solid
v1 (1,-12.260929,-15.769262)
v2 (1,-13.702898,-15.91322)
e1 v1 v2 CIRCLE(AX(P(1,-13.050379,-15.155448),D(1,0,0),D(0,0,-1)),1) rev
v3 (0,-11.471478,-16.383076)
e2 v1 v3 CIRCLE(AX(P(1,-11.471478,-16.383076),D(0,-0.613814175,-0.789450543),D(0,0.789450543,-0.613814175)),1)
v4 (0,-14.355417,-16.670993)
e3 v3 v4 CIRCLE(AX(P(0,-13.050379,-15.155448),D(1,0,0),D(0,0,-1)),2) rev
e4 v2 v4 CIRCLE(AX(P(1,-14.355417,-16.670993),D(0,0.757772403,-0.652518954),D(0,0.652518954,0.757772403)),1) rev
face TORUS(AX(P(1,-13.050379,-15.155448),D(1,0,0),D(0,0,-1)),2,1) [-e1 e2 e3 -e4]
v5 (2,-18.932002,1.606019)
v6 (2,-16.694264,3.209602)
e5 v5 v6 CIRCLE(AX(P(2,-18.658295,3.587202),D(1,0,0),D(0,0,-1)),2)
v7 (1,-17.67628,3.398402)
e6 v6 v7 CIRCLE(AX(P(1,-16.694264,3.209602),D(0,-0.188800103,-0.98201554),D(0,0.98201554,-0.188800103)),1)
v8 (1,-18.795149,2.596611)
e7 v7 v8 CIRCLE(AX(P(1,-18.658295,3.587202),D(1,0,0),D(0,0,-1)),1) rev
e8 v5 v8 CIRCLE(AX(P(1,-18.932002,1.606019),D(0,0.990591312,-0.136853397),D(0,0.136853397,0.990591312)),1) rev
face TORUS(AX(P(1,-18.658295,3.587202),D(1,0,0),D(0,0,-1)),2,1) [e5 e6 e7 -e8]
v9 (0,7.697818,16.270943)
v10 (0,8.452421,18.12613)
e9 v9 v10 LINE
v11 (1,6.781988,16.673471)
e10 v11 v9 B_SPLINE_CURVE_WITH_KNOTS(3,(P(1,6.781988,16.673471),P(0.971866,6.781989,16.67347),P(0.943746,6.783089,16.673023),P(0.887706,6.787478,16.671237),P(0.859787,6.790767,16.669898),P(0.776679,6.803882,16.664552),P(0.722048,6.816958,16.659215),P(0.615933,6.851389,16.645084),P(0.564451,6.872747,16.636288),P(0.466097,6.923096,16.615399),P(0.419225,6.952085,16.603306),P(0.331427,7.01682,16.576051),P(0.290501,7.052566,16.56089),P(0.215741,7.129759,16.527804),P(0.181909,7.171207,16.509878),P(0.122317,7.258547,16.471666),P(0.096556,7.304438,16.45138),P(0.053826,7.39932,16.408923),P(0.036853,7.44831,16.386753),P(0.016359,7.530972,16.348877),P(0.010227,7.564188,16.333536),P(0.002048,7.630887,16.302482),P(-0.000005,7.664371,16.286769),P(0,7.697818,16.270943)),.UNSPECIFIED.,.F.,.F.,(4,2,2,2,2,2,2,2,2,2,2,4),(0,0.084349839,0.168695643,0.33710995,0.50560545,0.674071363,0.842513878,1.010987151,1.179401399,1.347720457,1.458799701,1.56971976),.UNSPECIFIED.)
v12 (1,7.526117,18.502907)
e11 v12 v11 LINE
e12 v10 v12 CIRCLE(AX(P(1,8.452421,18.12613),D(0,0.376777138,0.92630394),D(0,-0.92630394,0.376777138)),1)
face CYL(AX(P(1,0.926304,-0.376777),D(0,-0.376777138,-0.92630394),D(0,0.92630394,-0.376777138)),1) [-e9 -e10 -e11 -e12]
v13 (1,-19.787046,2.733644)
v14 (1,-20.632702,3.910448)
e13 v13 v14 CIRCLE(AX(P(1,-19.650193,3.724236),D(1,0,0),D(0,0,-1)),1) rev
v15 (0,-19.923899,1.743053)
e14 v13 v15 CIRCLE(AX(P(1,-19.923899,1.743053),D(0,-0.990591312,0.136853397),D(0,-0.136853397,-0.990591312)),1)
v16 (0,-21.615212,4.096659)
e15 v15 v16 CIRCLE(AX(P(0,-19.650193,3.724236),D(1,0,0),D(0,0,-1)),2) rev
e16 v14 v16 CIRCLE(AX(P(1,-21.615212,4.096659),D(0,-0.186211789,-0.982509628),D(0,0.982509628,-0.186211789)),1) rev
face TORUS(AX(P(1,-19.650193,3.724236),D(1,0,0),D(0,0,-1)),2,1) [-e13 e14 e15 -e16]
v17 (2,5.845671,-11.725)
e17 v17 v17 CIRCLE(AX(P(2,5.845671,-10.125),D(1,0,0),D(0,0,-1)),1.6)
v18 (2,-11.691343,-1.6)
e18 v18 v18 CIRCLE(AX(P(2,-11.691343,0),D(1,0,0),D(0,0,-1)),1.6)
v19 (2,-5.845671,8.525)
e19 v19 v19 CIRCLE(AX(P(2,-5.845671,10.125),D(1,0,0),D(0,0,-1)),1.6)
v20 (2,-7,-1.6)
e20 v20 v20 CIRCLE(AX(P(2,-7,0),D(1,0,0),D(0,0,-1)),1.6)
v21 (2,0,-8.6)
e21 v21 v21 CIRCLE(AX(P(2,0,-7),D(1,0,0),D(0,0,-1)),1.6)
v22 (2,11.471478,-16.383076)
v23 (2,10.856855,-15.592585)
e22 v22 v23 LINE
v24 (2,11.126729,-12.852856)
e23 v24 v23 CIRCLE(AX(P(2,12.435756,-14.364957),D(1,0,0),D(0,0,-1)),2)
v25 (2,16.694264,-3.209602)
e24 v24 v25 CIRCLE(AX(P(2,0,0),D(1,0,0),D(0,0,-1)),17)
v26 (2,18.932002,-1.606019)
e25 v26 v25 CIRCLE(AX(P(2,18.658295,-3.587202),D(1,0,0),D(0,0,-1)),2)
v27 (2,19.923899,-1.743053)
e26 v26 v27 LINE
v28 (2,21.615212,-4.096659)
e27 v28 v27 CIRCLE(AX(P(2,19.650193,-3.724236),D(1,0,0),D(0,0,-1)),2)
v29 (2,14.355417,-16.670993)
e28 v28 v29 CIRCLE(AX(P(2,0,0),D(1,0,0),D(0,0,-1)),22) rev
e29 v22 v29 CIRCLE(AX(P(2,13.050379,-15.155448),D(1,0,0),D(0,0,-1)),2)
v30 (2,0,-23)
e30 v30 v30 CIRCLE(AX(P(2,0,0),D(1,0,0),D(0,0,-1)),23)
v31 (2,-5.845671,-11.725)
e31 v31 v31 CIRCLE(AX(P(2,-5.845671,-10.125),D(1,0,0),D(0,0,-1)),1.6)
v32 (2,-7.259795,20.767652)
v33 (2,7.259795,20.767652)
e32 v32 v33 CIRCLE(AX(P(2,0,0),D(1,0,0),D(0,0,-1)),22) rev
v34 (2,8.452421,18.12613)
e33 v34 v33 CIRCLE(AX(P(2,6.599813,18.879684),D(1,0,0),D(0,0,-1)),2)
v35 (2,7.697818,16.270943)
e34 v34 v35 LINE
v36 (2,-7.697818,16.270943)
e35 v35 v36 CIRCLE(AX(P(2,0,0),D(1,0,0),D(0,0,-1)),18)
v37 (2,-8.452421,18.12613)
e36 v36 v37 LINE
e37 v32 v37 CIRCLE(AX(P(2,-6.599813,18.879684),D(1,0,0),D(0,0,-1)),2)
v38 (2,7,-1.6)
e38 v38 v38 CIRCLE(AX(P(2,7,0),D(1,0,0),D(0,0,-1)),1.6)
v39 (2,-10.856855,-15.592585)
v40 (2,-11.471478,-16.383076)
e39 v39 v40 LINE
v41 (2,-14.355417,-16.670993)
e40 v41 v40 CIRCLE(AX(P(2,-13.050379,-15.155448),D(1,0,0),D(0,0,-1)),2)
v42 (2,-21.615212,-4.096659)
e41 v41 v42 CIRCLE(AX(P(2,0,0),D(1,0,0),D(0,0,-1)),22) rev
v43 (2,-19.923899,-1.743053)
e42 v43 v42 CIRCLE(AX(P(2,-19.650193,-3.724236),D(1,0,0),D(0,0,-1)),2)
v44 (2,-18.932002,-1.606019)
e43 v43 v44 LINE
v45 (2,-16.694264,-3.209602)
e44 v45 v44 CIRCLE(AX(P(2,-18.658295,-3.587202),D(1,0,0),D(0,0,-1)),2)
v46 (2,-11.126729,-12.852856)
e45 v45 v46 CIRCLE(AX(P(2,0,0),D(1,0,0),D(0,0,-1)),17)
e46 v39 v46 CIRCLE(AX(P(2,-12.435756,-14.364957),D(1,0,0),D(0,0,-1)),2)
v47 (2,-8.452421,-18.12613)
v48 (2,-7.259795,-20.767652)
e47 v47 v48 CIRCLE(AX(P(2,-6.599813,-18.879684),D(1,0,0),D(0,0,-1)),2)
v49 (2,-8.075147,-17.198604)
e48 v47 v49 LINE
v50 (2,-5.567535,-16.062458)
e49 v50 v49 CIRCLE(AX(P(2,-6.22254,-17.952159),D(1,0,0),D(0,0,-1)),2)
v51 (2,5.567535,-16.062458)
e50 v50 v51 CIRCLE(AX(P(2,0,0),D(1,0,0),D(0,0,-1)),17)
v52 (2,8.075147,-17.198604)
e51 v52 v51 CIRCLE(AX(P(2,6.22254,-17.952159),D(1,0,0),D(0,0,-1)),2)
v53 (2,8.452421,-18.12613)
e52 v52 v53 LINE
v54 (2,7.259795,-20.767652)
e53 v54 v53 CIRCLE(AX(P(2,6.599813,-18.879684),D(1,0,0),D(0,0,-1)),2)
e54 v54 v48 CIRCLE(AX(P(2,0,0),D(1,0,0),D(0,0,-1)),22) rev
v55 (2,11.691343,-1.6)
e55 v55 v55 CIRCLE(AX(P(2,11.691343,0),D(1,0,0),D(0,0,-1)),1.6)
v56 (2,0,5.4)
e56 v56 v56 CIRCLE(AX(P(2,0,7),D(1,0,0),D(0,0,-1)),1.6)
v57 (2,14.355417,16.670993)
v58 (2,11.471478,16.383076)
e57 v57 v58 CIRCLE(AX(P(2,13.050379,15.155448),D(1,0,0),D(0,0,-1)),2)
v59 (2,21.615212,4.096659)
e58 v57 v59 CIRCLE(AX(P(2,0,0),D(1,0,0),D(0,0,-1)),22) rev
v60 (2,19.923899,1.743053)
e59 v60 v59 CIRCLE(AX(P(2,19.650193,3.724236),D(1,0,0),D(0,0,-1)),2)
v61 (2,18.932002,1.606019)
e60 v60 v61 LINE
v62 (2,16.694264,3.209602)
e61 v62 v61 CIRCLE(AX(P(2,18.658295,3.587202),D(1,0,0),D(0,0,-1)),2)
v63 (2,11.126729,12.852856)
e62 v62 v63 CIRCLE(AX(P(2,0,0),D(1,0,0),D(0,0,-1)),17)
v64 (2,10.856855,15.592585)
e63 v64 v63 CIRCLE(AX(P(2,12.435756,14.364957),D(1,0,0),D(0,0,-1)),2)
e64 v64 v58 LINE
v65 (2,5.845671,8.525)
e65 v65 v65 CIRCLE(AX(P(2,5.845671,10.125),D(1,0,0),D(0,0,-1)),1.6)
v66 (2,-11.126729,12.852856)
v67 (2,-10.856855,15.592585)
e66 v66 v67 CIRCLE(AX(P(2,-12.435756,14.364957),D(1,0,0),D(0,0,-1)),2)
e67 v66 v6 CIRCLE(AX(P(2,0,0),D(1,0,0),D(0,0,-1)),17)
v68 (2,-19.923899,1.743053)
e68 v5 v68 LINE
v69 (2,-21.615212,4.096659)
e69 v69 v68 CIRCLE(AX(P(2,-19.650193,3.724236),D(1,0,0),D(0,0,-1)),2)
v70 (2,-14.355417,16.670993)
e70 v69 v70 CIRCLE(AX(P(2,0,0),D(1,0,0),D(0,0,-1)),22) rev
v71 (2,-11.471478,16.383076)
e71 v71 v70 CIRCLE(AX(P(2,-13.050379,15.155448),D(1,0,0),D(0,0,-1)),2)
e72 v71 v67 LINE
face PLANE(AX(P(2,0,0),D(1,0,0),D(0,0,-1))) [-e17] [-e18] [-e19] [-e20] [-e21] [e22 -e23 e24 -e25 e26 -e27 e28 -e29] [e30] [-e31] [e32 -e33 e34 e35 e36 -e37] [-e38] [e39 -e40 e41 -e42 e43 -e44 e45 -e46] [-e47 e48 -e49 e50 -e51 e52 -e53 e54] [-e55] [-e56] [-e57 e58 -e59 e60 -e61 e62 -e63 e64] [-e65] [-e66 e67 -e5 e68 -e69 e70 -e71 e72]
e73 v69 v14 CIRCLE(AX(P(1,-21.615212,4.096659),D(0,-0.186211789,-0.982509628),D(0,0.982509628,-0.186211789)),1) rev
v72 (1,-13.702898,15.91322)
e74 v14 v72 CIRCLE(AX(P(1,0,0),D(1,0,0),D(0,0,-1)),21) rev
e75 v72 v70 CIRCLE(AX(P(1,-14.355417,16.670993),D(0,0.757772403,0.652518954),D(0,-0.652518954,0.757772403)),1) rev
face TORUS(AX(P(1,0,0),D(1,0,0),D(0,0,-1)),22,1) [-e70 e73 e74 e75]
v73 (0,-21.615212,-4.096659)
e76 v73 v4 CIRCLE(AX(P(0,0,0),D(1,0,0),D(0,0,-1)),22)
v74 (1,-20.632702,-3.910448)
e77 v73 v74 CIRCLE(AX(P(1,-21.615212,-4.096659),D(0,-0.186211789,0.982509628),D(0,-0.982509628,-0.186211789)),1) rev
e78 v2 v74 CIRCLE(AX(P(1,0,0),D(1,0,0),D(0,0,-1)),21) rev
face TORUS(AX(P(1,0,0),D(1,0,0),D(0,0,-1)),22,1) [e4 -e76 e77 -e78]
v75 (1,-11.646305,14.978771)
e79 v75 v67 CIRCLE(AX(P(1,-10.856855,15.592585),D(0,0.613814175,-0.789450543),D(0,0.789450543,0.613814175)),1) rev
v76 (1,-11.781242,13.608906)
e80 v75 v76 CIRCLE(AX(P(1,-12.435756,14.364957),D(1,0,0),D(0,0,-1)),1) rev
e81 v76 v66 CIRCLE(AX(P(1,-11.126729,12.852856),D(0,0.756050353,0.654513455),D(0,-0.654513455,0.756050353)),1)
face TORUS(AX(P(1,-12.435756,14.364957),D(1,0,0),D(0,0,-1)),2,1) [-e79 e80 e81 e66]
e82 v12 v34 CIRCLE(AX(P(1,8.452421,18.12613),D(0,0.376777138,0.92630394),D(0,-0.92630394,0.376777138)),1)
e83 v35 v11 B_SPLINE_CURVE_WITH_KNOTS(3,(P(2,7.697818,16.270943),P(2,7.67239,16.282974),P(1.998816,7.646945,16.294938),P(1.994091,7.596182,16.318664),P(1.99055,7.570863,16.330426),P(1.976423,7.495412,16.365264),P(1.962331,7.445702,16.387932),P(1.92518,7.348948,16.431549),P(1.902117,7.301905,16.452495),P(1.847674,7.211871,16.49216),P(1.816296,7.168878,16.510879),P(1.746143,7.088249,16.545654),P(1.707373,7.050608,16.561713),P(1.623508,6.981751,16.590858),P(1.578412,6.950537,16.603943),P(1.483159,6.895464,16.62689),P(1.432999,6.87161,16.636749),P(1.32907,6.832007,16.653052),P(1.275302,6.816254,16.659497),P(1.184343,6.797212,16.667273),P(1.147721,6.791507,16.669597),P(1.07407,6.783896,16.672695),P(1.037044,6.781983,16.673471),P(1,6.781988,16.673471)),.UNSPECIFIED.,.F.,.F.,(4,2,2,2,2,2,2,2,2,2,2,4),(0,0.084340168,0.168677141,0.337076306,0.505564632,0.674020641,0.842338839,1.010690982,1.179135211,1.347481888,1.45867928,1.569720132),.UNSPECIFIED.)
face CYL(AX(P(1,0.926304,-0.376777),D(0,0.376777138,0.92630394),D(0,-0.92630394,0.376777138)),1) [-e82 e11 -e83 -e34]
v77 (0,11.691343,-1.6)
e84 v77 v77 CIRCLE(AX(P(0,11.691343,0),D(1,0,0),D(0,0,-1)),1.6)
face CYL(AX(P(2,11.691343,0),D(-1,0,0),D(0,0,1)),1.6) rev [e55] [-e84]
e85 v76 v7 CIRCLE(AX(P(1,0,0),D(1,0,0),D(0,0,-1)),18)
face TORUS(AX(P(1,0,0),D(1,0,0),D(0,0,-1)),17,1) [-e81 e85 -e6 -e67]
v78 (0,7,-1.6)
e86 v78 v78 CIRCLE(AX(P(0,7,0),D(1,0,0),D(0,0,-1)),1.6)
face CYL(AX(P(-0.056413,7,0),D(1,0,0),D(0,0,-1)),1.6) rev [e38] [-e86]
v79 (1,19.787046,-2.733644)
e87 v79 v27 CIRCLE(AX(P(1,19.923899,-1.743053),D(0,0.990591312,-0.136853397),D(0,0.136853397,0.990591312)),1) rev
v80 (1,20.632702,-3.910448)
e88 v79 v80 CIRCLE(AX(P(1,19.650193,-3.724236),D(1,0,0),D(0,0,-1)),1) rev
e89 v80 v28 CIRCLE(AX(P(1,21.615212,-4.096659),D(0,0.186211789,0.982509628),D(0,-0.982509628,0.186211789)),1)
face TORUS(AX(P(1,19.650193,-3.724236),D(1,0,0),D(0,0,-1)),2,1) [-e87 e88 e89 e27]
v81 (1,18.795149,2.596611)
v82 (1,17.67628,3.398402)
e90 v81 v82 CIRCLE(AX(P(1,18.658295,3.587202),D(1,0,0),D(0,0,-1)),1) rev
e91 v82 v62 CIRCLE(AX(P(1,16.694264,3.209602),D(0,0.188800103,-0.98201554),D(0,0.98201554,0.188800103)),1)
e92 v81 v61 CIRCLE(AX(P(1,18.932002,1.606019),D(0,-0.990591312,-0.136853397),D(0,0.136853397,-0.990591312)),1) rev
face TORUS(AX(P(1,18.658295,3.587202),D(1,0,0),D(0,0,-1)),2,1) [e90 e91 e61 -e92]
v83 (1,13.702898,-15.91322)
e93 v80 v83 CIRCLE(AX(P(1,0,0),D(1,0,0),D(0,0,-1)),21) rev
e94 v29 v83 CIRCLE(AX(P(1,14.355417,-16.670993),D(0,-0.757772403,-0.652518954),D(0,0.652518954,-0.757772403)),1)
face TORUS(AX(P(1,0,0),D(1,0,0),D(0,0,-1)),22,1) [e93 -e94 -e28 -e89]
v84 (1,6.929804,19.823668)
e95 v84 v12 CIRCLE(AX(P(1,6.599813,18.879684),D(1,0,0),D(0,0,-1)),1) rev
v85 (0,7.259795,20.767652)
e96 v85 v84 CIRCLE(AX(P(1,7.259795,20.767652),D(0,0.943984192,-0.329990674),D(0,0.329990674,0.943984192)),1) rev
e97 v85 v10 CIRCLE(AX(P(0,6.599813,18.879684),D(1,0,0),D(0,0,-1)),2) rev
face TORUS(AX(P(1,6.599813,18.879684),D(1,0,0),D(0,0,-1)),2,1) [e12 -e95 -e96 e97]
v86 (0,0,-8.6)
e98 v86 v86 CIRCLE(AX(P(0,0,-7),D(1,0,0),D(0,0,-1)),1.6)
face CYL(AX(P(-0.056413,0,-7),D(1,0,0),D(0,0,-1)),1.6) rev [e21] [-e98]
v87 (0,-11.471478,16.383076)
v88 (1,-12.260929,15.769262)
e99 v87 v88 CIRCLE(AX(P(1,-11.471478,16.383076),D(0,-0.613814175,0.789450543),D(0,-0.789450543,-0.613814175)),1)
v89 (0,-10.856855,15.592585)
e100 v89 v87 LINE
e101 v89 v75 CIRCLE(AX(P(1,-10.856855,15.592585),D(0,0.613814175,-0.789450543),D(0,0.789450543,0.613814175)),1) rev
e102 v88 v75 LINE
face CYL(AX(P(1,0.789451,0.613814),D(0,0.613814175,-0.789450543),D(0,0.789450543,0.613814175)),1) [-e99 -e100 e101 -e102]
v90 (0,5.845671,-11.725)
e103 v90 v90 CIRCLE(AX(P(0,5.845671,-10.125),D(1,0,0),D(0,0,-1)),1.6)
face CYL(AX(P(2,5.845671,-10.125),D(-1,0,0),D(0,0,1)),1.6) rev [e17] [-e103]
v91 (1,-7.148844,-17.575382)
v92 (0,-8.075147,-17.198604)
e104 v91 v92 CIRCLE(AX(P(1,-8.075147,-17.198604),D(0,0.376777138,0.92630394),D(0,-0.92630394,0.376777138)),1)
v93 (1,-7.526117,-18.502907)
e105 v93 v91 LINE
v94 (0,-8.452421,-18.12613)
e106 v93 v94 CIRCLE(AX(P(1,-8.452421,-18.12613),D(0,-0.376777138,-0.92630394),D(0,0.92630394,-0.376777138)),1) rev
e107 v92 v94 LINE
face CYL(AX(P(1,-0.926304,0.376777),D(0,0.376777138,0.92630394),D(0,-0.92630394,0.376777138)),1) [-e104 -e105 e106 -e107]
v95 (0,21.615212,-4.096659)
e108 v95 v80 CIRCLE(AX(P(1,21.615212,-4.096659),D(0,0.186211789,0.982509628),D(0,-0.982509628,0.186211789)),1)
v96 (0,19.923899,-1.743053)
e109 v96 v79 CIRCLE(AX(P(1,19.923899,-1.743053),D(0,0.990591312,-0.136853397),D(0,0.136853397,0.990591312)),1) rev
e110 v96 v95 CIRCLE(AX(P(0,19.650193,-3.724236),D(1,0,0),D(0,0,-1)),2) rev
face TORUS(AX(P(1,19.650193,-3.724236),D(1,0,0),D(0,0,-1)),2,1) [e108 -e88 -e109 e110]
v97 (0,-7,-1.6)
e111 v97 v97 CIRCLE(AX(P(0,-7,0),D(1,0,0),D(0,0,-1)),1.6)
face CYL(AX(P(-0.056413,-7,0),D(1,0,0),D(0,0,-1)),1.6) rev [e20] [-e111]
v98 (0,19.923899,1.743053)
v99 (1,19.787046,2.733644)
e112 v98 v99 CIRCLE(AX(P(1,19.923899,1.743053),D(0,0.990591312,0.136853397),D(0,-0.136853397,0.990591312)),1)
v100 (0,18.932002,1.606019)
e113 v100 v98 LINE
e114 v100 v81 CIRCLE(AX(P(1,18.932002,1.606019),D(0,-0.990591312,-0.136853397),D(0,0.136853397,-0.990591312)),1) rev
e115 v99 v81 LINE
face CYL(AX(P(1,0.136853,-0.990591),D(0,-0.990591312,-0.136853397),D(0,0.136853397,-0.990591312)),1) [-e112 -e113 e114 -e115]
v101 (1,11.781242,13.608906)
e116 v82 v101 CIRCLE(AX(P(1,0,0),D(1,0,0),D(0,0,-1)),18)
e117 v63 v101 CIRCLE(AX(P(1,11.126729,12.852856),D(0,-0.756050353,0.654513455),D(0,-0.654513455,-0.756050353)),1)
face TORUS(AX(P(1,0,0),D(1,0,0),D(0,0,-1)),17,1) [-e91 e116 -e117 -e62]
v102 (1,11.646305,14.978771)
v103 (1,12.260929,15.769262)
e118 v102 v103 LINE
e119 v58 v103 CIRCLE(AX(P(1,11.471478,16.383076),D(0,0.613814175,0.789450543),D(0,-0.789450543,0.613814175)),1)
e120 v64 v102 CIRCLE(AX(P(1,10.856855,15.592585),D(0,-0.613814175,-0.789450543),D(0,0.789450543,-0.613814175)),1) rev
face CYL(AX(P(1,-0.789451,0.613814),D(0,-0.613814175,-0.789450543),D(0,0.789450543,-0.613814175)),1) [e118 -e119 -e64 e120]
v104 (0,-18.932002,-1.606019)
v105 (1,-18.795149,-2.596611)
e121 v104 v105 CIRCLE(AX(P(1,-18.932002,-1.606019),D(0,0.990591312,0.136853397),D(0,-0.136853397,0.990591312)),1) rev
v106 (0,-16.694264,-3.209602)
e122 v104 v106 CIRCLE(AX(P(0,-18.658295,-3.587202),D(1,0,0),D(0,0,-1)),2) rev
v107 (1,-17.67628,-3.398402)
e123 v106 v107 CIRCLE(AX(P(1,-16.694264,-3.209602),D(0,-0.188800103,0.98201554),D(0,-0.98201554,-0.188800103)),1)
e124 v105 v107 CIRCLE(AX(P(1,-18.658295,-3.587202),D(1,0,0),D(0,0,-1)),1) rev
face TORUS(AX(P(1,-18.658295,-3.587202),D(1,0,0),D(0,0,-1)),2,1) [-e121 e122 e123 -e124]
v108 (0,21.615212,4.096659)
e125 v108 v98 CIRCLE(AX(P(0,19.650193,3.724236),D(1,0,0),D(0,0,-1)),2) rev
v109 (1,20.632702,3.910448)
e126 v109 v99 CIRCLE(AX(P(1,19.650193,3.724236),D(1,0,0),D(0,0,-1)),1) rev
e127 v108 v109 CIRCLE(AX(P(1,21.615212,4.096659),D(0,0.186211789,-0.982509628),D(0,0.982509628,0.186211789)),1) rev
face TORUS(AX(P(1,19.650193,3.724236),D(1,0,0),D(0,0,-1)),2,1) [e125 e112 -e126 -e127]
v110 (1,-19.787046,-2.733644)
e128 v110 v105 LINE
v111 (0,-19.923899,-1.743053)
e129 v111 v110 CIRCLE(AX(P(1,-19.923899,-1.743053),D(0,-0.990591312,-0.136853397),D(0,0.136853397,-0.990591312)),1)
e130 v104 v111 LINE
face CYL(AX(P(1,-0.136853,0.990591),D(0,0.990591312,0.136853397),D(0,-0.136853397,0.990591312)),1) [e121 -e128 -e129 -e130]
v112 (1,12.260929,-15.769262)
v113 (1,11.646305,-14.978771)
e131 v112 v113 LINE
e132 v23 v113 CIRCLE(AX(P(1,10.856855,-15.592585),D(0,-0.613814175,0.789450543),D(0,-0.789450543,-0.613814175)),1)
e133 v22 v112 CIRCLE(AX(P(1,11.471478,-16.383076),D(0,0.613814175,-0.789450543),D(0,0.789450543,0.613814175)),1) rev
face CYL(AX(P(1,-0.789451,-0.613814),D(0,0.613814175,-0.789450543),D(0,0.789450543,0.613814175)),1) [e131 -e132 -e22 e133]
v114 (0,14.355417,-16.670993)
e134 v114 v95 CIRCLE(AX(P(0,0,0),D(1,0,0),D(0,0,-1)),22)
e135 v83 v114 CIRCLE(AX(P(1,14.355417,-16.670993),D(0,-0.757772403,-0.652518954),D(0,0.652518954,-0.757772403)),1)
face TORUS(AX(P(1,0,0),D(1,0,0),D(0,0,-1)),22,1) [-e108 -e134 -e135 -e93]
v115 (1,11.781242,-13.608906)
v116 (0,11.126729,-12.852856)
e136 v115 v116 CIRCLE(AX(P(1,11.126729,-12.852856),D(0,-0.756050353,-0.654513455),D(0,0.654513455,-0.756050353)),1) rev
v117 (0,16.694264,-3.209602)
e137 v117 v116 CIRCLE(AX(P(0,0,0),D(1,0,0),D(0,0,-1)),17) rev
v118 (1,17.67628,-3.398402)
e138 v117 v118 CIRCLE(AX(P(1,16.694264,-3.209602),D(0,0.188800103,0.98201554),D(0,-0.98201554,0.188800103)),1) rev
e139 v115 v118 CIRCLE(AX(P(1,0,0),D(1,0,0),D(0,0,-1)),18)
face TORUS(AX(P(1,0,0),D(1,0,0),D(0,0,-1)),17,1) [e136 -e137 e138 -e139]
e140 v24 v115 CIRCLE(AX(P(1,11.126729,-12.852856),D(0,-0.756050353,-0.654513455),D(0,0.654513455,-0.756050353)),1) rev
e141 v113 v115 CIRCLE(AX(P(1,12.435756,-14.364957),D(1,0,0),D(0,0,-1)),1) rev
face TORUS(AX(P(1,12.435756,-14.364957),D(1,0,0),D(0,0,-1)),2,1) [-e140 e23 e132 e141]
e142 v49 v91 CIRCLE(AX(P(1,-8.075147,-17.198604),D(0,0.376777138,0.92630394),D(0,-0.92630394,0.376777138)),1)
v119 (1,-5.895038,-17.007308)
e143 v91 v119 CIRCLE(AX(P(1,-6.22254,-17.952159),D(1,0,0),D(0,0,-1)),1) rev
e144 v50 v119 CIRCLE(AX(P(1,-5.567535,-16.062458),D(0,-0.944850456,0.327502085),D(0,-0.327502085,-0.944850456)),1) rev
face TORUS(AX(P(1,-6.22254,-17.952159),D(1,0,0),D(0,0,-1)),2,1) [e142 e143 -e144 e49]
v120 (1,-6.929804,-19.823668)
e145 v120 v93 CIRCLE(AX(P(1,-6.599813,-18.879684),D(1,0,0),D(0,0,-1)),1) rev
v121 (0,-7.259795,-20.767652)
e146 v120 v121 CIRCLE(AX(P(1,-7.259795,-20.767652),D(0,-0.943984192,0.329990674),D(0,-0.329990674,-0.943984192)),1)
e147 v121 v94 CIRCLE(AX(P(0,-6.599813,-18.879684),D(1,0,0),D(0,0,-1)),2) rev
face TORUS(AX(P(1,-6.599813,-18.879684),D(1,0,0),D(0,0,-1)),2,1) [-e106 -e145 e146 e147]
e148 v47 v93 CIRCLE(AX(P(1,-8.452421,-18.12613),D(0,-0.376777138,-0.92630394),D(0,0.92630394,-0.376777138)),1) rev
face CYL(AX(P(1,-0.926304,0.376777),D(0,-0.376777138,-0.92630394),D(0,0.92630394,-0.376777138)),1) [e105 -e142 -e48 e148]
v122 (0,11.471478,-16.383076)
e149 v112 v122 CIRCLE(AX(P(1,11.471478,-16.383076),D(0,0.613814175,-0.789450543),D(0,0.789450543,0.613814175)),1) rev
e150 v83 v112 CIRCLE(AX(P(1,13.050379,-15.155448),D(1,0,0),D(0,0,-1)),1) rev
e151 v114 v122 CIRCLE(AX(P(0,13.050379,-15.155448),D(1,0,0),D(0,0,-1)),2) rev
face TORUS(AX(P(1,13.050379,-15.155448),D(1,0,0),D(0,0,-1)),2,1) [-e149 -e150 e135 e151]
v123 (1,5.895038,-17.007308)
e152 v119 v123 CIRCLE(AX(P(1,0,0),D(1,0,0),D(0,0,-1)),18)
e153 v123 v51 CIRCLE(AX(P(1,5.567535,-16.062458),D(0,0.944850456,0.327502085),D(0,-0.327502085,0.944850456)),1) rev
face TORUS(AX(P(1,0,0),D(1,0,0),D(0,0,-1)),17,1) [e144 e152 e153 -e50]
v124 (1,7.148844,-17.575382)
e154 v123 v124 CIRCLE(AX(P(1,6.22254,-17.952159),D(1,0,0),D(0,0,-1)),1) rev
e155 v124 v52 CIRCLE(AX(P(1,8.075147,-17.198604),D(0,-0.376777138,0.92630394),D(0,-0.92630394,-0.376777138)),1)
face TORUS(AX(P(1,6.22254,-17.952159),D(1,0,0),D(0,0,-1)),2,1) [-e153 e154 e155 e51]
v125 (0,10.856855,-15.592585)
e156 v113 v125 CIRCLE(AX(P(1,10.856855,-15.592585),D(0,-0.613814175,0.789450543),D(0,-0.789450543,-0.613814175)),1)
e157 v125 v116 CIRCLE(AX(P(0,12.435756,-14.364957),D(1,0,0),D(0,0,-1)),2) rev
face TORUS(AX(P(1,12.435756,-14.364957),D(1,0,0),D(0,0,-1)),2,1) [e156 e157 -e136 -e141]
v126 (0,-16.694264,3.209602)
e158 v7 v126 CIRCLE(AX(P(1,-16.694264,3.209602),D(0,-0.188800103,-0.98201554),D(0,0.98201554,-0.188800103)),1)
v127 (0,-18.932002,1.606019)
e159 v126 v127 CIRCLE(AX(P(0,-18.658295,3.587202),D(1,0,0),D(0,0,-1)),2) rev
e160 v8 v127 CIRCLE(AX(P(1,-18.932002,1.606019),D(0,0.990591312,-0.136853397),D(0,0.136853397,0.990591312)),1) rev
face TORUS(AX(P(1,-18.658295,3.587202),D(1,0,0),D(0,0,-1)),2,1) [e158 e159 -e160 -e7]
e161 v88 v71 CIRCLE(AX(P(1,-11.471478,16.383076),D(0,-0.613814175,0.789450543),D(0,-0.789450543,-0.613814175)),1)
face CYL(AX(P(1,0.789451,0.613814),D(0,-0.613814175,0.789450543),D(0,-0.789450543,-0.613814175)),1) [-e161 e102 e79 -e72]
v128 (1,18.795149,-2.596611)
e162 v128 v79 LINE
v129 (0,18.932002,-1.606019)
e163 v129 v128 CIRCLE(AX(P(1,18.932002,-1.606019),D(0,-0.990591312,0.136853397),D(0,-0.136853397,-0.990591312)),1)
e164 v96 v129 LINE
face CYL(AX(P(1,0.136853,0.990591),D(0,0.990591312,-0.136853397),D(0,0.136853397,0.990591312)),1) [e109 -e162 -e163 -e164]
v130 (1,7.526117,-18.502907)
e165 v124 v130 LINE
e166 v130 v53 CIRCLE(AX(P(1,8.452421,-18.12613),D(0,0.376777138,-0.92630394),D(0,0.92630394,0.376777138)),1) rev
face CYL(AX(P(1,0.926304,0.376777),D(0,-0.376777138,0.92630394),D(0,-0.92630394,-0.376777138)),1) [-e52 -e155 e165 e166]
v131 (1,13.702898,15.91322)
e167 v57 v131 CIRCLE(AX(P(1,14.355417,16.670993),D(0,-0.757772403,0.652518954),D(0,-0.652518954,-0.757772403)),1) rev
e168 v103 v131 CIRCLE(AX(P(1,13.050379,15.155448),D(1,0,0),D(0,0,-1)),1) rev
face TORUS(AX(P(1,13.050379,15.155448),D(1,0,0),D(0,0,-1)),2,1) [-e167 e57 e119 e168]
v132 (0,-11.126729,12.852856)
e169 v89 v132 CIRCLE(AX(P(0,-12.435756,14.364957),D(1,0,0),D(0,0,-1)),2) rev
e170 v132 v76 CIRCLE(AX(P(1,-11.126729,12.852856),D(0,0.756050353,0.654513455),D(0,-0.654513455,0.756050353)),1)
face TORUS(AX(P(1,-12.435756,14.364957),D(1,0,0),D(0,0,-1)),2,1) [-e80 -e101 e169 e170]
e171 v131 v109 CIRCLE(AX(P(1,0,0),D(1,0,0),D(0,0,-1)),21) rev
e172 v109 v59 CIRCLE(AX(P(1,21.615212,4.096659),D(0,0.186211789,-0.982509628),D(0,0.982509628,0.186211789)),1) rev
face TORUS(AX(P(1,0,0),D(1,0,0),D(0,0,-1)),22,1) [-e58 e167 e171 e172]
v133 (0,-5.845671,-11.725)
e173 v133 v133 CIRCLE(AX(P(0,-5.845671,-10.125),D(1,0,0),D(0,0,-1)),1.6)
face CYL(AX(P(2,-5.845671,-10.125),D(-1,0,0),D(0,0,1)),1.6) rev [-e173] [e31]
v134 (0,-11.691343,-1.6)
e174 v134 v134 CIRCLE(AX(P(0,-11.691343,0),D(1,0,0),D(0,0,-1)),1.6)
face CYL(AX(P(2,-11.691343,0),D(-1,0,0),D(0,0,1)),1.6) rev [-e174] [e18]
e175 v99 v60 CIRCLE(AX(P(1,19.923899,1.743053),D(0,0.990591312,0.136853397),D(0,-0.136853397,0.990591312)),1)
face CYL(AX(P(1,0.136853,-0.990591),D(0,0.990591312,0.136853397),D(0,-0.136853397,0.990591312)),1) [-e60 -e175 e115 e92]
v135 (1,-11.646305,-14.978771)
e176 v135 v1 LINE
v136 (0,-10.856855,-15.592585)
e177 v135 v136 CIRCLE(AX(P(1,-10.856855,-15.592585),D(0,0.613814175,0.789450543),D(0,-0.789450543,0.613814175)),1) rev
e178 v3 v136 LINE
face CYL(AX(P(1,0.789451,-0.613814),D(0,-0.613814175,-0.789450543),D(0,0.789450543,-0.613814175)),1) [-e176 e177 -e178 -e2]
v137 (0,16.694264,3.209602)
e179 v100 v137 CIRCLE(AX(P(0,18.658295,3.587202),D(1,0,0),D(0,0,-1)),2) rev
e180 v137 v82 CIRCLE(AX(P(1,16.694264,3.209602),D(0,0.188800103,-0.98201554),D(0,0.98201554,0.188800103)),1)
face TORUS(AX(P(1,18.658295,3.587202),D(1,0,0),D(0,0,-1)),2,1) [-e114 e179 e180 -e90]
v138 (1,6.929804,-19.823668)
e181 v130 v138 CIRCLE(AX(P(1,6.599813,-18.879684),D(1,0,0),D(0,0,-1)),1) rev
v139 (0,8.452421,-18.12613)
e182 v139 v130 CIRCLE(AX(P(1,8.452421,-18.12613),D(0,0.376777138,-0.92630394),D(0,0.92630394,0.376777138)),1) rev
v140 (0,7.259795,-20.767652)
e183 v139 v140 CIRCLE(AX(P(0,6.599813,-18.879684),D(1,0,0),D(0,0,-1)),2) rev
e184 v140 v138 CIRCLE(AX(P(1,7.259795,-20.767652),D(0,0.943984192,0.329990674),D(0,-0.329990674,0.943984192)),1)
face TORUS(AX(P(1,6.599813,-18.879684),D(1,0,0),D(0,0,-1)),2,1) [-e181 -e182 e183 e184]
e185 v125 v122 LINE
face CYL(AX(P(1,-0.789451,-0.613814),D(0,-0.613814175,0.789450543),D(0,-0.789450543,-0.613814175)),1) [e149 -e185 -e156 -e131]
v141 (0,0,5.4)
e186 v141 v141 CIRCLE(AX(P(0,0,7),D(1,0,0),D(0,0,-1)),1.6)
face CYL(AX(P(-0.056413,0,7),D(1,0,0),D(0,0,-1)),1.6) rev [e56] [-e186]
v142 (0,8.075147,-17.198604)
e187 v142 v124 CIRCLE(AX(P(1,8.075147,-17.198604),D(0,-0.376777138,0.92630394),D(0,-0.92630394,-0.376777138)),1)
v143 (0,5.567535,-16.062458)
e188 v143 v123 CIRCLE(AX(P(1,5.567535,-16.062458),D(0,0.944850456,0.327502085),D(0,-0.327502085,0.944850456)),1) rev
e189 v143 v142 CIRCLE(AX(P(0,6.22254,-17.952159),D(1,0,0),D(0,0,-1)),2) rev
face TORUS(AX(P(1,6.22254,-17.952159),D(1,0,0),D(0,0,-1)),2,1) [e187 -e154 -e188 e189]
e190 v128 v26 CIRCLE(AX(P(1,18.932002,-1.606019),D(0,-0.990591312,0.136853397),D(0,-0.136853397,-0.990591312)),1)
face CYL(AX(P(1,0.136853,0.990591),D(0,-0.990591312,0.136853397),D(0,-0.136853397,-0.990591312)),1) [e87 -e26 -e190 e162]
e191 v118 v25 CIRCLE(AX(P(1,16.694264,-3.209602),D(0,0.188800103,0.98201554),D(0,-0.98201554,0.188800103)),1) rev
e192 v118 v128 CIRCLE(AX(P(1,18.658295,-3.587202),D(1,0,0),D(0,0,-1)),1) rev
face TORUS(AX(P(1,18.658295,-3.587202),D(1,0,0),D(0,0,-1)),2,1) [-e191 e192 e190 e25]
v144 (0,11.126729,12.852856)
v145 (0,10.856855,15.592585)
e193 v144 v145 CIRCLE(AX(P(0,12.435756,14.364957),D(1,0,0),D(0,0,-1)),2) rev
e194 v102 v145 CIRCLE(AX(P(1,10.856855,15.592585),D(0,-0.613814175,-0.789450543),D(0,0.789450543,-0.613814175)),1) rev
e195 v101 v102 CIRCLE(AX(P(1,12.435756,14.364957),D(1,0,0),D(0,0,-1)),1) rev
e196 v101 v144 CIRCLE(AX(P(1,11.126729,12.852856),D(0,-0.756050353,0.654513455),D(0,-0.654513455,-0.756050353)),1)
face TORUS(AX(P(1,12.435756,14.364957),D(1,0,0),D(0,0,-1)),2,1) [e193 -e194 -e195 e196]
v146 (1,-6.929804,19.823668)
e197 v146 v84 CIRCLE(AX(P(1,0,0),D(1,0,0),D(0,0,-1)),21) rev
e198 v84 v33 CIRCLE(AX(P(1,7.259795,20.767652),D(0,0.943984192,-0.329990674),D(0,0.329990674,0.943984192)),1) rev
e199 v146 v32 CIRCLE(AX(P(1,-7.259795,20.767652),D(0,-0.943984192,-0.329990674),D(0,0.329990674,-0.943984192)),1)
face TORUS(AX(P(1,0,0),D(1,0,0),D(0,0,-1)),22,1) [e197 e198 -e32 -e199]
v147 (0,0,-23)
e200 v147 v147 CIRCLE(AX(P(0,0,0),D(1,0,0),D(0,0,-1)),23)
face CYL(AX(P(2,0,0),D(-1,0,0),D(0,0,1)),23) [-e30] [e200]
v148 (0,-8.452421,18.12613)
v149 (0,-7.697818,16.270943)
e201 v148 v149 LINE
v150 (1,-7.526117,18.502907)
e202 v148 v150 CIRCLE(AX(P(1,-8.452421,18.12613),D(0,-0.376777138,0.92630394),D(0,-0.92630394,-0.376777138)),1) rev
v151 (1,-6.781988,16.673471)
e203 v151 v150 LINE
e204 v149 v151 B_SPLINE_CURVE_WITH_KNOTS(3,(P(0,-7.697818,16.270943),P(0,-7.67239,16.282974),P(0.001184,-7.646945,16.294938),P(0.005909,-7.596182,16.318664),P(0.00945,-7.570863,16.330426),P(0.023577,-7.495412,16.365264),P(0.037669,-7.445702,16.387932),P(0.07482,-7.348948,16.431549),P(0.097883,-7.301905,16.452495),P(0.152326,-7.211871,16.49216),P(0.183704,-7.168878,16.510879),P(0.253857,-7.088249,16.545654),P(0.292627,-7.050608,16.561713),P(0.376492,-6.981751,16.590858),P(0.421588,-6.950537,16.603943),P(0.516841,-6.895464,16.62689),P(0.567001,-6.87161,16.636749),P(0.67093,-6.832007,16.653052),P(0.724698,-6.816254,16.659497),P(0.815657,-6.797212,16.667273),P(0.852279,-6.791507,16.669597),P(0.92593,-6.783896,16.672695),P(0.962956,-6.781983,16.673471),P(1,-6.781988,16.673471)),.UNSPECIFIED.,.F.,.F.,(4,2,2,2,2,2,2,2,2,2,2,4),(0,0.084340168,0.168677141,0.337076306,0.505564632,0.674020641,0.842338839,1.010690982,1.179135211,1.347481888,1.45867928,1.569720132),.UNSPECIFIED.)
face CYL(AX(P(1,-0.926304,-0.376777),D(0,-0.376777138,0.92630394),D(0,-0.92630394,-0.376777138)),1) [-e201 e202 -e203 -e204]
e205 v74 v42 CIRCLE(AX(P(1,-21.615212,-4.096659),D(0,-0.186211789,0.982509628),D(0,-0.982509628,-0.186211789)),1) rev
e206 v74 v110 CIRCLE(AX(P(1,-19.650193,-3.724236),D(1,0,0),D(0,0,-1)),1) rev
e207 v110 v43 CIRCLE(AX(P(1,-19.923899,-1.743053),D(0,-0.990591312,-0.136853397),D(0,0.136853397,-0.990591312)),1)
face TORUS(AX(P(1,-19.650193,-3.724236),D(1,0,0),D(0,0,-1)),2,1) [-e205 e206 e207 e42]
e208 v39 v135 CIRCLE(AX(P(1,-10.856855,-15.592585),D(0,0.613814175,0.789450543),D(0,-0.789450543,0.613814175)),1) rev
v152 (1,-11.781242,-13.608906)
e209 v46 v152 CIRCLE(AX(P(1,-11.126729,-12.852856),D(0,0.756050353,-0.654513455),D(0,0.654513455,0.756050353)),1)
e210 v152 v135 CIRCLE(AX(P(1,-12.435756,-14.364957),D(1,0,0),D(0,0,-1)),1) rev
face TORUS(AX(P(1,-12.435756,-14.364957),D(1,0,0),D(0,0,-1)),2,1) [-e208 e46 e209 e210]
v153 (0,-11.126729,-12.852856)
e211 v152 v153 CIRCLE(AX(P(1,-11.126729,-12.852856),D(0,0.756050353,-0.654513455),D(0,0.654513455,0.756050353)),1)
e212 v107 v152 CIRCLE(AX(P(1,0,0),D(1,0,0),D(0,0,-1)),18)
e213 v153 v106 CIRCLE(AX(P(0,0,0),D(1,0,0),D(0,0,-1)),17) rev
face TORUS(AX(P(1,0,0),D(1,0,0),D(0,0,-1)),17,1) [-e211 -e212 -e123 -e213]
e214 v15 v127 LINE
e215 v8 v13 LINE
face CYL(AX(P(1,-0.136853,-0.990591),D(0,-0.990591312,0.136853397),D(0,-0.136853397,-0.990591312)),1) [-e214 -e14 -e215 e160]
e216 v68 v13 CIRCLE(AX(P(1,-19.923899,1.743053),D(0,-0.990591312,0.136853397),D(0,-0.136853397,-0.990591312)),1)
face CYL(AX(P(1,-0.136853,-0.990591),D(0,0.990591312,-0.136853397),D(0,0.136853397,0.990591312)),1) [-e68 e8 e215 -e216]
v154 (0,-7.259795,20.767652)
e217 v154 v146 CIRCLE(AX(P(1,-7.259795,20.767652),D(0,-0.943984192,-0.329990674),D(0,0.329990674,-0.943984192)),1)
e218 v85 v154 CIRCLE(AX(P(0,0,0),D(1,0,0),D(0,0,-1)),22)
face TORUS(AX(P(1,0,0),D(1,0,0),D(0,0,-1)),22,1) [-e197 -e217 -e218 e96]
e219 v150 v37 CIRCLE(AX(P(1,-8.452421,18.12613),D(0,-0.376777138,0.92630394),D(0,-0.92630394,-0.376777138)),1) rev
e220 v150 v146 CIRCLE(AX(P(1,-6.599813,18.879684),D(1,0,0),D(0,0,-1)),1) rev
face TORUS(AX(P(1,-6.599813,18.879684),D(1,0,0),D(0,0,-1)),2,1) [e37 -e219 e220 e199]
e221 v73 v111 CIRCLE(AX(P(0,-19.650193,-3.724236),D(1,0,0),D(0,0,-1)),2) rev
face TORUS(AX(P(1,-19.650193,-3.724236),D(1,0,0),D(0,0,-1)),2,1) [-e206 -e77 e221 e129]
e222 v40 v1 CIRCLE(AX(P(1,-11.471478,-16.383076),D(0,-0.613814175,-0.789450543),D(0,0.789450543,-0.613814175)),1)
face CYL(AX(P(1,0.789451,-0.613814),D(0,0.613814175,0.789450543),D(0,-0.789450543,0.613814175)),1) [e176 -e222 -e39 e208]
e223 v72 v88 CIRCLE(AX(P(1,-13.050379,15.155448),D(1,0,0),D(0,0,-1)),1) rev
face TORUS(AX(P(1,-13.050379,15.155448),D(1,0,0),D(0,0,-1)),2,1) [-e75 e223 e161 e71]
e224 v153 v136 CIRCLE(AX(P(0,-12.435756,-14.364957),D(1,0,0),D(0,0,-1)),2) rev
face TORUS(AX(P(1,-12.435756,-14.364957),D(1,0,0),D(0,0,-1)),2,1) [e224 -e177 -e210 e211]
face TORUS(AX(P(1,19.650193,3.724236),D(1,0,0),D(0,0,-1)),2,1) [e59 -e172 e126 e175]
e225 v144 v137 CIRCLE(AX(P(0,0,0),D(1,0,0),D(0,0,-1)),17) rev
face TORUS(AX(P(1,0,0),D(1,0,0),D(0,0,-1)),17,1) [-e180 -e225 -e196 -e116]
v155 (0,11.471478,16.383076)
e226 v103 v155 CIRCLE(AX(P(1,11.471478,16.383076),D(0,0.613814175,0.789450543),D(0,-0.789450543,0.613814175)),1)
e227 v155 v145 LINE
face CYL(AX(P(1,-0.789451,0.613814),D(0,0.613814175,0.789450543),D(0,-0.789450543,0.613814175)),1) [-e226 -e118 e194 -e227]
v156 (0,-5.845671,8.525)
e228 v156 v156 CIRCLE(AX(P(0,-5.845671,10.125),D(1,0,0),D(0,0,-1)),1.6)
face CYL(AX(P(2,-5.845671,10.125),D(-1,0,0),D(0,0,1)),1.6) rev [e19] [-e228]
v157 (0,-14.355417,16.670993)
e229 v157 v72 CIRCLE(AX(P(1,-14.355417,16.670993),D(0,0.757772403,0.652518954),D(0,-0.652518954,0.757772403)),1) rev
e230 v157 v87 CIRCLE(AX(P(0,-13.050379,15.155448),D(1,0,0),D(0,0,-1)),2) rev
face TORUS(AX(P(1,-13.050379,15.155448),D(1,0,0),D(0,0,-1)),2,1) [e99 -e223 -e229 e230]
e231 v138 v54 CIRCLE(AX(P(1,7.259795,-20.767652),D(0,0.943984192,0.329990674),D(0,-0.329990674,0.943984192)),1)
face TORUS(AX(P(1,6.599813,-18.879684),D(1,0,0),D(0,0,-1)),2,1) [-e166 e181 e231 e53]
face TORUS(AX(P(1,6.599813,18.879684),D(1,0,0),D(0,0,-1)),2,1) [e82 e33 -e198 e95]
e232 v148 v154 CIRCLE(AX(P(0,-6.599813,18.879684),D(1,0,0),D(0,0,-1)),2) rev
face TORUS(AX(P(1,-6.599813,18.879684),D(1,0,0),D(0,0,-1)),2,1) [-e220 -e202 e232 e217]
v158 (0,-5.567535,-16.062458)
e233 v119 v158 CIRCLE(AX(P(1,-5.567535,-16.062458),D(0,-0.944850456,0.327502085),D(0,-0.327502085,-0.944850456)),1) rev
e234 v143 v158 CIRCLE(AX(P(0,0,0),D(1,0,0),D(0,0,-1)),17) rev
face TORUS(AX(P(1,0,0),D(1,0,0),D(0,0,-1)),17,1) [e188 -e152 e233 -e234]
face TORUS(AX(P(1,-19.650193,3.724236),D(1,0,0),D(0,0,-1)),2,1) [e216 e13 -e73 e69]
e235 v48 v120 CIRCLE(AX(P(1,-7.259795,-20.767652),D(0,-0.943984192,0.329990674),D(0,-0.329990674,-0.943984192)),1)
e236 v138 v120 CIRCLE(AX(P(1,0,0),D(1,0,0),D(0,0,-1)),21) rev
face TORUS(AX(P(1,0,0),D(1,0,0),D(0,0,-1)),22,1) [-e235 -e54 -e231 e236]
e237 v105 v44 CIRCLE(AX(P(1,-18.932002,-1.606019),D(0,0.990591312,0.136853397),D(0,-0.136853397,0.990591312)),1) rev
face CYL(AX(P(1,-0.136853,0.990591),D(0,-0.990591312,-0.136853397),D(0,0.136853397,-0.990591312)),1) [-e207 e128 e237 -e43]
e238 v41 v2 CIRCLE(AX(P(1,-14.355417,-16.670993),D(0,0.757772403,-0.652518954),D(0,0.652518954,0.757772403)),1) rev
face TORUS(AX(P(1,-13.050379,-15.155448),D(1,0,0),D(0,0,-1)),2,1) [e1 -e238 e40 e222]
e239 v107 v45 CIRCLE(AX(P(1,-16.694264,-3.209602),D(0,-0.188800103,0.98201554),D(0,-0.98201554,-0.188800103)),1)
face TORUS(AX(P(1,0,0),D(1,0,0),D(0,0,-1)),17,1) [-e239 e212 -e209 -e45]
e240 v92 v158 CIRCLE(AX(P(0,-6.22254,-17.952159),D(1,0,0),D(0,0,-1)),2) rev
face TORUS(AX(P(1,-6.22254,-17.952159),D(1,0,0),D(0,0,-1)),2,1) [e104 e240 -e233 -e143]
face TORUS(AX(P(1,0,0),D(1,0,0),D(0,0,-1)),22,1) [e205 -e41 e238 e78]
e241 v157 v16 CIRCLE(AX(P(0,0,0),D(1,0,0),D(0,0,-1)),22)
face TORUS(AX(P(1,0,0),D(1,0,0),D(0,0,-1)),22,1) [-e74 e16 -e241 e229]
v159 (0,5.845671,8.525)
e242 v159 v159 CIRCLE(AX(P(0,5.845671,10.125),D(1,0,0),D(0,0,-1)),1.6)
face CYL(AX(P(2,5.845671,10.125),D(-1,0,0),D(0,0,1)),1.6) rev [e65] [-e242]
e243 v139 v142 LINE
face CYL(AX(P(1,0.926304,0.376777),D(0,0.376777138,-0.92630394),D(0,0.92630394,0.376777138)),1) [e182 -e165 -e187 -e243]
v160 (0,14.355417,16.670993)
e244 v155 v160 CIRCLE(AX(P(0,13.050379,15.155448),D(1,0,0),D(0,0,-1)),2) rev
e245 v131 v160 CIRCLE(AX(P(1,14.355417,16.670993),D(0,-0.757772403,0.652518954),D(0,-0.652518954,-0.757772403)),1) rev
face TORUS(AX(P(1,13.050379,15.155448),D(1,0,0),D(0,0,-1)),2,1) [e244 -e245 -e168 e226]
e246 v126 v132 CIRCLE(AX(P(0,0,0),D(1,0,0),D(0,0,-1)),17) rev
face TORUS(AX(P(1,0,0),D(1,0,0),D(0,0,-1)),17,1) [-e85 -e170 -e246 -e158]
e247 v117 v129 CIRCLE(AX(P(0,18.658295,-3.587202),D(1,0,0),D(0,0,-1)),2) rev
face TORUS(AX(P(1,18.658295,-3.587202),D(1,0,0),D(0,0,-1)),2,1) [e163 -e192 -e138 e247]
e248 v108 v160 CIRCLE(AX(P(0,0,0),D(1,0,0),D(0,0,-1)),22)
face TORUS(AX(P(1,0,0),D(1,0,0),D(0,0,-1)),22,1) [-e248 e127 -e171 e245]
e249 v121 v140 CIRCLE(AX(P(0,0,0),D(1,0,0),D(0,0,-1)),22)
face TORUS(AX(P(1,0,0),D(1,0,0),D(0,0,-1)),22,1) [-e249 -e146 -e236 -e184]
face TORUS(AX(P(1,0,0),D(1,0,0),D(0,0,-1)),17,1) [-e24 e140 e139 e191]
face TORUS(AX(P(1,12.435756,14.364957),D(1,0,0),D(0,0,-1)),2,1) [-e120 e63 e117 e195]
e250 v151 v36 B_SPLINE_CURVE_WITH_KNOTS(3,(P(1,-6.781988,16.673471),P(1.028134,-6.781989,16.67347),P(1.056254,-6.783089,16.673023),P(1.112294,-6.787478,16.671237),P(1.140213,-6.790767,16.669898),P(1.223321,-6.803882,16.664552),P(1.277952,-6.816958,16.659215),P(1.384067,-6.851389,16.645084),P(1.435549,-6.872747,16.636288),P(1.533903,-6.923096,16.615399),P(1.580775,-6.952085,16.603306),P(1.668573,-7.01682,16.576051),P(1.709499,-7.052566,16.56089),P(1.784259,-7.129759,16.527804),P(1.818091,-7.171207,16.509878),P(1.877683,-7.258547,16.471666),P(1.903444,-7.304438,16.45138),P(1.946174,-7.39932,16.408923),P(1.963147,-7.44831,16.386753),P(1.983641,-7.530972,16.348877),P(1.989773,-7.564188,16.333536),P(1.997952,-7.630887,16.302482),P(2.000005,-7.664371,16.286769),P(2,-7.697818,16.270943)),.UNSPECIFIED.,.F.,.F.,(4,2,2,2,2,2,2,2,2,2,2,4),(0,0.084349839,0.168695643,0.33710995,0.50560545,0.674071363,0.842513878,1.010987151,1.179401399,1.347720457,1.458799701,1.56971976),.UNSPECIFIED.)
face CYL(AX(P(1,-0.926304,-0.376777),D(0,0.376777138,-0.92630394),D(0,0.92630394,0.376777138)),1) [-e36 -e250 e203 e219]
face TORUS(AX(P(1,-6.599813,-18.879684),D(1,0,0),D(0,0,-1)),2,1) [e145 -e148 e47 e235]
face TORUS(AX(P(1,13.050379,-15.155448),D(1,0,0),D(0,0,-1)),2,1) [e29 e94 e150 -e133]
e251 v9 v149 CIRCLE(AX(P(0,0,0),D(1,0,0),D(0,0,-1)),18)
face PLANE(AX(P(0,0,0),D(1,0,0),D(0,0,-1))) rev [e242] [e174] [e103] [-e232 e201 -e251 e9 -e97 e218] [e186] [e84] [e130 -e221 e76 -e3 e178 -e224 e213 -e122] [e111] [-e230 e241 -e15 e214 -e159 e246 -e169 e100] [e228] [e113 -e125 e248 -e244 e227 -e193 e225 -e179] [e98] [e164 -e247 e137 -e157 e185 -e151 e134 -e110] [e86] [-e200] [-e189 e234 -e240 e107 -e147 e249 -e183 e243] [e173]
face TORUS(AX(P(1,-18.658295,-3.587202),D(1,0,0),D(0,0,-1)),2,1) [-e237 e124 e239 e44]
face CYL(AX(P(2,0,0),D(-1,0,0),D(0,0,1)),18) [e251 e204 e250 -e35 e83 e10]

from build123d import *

# Parameters (mm, degrees)
SKETCH1_R           = 23
SKETCH1_R_2         = 1.6
BOSS_EXTRUDE1_DEPTH = 2
FILLET1_R           = 1
SKETCH2_R           = 1.6
CUT_EXTRUDE1_DEPTH  = 33.58834148


with BuildPart() as part:
    # Sketch1 → Boss-Extrude1 (new body)
    with BuildSketch(Plane(origin=(0, 0, 0), x_dir=(0, 0, -1), z_dir=(1, 0, 0))):
        Circle(SKETCH1_R)
        with Locations((-10.125, 5.845671476)):
            Circle(SKETCH1_R_2, mode=Mode.SUBTRACT)
        with Locations((-10.125, -5.845671476)):
            Circle(SKETCH1_R_2, mode=Mode.SUBTRACT)
        with Locations((0, -11.691342951)):
            Circle(SKETCH1_R_2, mode=Mode.SUBTRACT)
        with Locations((10.125, -5.845671476)):
            Circle(SKETCH1_R_2, mode=Mode.SUBTRACT)
        with Locations((10.125, 5.845671476)):
            Circle(SKETCH1_R_2, mode=Mode.SUBTRACT)
        with Locations((0, 11.691342951)):
            Circle(SKETCH1_R_2, mode=Mode.SUBTRACT)
        with BuildLine():
            ThreePointArc((14.210109765, -11.048655143), (9, -15.588457268), (2.463361149, -17.830643619))
            Line((2.463361149, -17.830643619), (2.87392134, -20.802417555))
            ThreePointArc((2.87392134, -20.802417555), (10.5, -18.186533479), (16.578461393, -12.890097666))
            Line((16.578461393, -12.890097666), (14.210109765, -11.048655143))
        make_face(mode=Mode.SUBTRACT)
        with BuildLine():
            ThreePointArc((-19.452382733, 7.912319889), (-21, 0), (-19.452382733, -7.912319889))
            Line((-19.452382733, -7.912319889), (-16.673470914, -6.781988476))
            ThreePointArc((-16.673470914, -6.781988476), (-18, 0), (-16.673470914, 6.781988476))
            Line((-16.673470914, 6.781988476), (-19.452382733, 7.912319889))
        make_face(mode=Mode.SUBTRACT)
        with BuildLine():
            ThreePointArc((16.578461393, 12.890097666), (10.5, 18.186533479), (2.87392134, 20.802417555))
            Line((2.87392134, 20.802417555), (2.463361149, 17.830643619))
            ThreePointArc((2.463361149, 17.830643619), (9, 15.588457268), (14.210109765, 11.048655143))
            Line((14.210109765, 11.048655143), (16.578461393, 12.890097666))
        make_face(mode=Mode.SUBTRACT)
        with BuildLine():
            Line((-2.87392134, 20.802417555), (-2.463361149, 17.830643619))
            ThreePointArc((-2.463361149, 17.830643619), (-9, 15.588457268), (-14.210109765, 11.048655143))
            Line((-14.210109765, 11.048655143), (-16.578461393, 12.890097666))
            ThreePointArc((-16.578461393, 12.890097666), (-10.5, 18.186533479), (-2.87392134, 20.802417555))
        make_face(mode=Mode.SUBTRACT)
        with BuildLine():
            Line((19.452382733, -7.912319889), (16.673470914, -6.781988476))
            ThreePointArc((16.673470914, -6.781988476), (18, 0), (16.673470914, 6.781988476))
            Line((16.673470914, 6.781988476), (19.452382733, 7.912319889))
            ThreePointArc((19.452382733, 7.912319889), (21, 0), (19.452382733, -7.912319889))
        make_face(mode=Mode.SUBTRACT)
        with BuildLine():
            Line((-16.578461393, -12.890097666), (-14.210109765, -11.048655143))
            ThreePointArc((-14.210109765, -11.048655143), (-9, -15.588457268), (-2.463361149, -17.830643619))
            Line((-2.463361149, -17.830643619), (-2.87392134, -20.802417555))
            ThreePointArc((-2.87392134, -20.802417555), (-10.5, -18.186533479), (-16.578461393, -12.890097666))
        make_face(mode=Mode.SUBTRACT)
    extrude(amount=BOSS_EXTRUDE1_DEPTH)

    # Fillet1
    fillet1_edges = [part.edges().sort_by_distance(p)[0] for p in [
        (1, -12.890097666, 16.578461393),
        (1, -20.802417555, 2.87392134),
        (1, -17.830643619, 2.463361149),
        (1, -11.048655143, 14.210109765),
        (1, -7.912319889, -19.452382733),
        (1, 7.912319889, -19.452382733),
        (1, 6.781988476, -16.673470914),
        (1, -6.781988476, -16.673470914),
        (1, 20.802417555, 2.87392134),
        (1, 12.890097666, 16.578461393),
        (1, 11.048655143, 14.210109765),
        (1, 17.830643619, 2.463361149),
        (1, 20.802417555, -2.87392134),
        (1, 17.830643619, -2.463361149),
        (1, 11.048655143, -14.210109765),
        (1, 12.890097666, -16.578461393),
        (1, -7.912319889, 19.452382733),
        (1, 7.912319889, 19.452382733),
        (1, -17.830643619, -2.463361149),
        (1, -20.802417555, -2.87392134),
        (1, -12.890097666, -16.578461393),
        (1, -11.048655143, -14.210109765),
    ]]
    fillet(fillet1_edges, radius=FILLET1_R)
    fillet1_2_edges = [part.edges().sort_by_distance(p)[0] for p in [
        (2, 19.291097312, 2.665127555),
        (2, 11.953616823, 15.374016561),
        (2, -7.337480489, -18.039144116),
        (2, 7.337480489, -18.039144116),
        (2, -11.953616823, 15.374016561),
        (2, -19.291097312, 2.665127555),
        (2, -11.953616823, -15.374016561),
        (2, -19.291097312, -2.665127555),
        (0, -19.291097312, 2.665127555),
        (0, -11.953616823, 15.374016561),
        (0, 7.337480489, -18.039144116),
        (0, -7.337480489, -18.039144116),
        (0, 11.953616823, 15.374016561),
        (0, 19.291097312, 2.665127555),
        (2, 7.154052952, 17.588188808),
        (0, 19.291097312, -2.665127555),
        (0, 11.953616823, -15.374016561),
        (0, -7.154052952, 17.588188808),
        (0, 7.154052952, 17.588188808),
        (0, -19.291097312, -2.665127555),
        (0, -11.953616823, -15.374016561),
        (2, -7.154052952, 17.588188808),
        (2, 11.953616823, -15.374016561),
        (2, 19.291097312, -2.665127555),
        (2, 20.462263856, -3.140677539),
        (2, 18.075807454, -2.774362517),
        (2, 11.440572146, -14.266927191),
        (2, 12.951038462, -16.150501549),
        (2, -7.511225394, 19.291179087),
        (0, -12.951038462, -16.150501549),
        (0, -11.440572146, -14.266927191),
        (0, -18.075807454, -2.774362517),
        (0, -20.462263856, -3.140677539),
        (0, 7.511225394, 19.291179087),
        (0, -7.511225394, 19.291179087),
        (0, 11.440572146, -14.266927191),
        (0, 12.951038462, -16.150501549),
        (0, 20.462263856, -3.140677539),
        (0, 18.075807454, -2.774362517),
        (2, 7.511225394, 19.291179087),
        (0, 20.462263856, 3.140677539),
        (0, 18.075807454, 2.774362517),
        (0, 11.440572146, 14.266927191),
        (0, 12.951038462, 16.150501549),
        (0, -7.511225394, -19.291179087),
        (0, -6.635235308, -17.041289708),
        (0, 6.635235308, -17.041289708),
        (0, 7.511225394, -19.291179087),
        (0, -12.951038462, 16.150501549),
        (0, -11.440572146, 14.266927191),
        (0, -18.075807454, 2.774362517),
        (0, -20.462263856, 3.140677539),
        (2, -18.075807454, -2.774362517),
        (2, -20.462263856, -3.140677539),
        (2, -12.951038462, -16.150501549),
        (2, -11.440572146, -14.266927191),
        (2, -18.075807454, 2.774362517),
        (2, -20.462263856, 3.140677539),
        (2, -12.951038462, 16.150501549),
        (2, -11.440572146, 14.266927191),
        (2, 6.635235308, -17.041289708),
        (2, 7.511225394, -19.291179087),
        (2, -7.511225394, -19.291179087),
        (2, -6.635235308, -17.041289708),
        (2, 11.440572146, 14.266927191),
        (2, 12.951038462, 16.150501549),
        (2, 20.462263856, 3.140677539),
        (2, 18.075807454, 2.774362517),
    ]]
    fillet(fillet1_2_edges, radius=FILLET1_R - 0.0001)  # a hair under: the kernel refuses the full size

    # Sketch2 → Cut-Extrude1 (cut, through all)
    with BuildSketch(Plane(origin=(2, 0, 0), x_dir=(0, 0, -1), z_dir=(1, 0, 0))):
        with Locations((7, 0)):
            Circle(SKETCH2_R)
        with Locations((0, -7)):
            Circle(SKETCH2_R)
        with Locations((-7, 0)):
            Circle(SKETCH2_R)
        with Locations((0, 7)):
            Circle(SKETCH2_R)
    extrude(amount=-CUT_EXTRUDE1_DEPTH, mode=Mode.SUBTRACT)


solid = part.part
